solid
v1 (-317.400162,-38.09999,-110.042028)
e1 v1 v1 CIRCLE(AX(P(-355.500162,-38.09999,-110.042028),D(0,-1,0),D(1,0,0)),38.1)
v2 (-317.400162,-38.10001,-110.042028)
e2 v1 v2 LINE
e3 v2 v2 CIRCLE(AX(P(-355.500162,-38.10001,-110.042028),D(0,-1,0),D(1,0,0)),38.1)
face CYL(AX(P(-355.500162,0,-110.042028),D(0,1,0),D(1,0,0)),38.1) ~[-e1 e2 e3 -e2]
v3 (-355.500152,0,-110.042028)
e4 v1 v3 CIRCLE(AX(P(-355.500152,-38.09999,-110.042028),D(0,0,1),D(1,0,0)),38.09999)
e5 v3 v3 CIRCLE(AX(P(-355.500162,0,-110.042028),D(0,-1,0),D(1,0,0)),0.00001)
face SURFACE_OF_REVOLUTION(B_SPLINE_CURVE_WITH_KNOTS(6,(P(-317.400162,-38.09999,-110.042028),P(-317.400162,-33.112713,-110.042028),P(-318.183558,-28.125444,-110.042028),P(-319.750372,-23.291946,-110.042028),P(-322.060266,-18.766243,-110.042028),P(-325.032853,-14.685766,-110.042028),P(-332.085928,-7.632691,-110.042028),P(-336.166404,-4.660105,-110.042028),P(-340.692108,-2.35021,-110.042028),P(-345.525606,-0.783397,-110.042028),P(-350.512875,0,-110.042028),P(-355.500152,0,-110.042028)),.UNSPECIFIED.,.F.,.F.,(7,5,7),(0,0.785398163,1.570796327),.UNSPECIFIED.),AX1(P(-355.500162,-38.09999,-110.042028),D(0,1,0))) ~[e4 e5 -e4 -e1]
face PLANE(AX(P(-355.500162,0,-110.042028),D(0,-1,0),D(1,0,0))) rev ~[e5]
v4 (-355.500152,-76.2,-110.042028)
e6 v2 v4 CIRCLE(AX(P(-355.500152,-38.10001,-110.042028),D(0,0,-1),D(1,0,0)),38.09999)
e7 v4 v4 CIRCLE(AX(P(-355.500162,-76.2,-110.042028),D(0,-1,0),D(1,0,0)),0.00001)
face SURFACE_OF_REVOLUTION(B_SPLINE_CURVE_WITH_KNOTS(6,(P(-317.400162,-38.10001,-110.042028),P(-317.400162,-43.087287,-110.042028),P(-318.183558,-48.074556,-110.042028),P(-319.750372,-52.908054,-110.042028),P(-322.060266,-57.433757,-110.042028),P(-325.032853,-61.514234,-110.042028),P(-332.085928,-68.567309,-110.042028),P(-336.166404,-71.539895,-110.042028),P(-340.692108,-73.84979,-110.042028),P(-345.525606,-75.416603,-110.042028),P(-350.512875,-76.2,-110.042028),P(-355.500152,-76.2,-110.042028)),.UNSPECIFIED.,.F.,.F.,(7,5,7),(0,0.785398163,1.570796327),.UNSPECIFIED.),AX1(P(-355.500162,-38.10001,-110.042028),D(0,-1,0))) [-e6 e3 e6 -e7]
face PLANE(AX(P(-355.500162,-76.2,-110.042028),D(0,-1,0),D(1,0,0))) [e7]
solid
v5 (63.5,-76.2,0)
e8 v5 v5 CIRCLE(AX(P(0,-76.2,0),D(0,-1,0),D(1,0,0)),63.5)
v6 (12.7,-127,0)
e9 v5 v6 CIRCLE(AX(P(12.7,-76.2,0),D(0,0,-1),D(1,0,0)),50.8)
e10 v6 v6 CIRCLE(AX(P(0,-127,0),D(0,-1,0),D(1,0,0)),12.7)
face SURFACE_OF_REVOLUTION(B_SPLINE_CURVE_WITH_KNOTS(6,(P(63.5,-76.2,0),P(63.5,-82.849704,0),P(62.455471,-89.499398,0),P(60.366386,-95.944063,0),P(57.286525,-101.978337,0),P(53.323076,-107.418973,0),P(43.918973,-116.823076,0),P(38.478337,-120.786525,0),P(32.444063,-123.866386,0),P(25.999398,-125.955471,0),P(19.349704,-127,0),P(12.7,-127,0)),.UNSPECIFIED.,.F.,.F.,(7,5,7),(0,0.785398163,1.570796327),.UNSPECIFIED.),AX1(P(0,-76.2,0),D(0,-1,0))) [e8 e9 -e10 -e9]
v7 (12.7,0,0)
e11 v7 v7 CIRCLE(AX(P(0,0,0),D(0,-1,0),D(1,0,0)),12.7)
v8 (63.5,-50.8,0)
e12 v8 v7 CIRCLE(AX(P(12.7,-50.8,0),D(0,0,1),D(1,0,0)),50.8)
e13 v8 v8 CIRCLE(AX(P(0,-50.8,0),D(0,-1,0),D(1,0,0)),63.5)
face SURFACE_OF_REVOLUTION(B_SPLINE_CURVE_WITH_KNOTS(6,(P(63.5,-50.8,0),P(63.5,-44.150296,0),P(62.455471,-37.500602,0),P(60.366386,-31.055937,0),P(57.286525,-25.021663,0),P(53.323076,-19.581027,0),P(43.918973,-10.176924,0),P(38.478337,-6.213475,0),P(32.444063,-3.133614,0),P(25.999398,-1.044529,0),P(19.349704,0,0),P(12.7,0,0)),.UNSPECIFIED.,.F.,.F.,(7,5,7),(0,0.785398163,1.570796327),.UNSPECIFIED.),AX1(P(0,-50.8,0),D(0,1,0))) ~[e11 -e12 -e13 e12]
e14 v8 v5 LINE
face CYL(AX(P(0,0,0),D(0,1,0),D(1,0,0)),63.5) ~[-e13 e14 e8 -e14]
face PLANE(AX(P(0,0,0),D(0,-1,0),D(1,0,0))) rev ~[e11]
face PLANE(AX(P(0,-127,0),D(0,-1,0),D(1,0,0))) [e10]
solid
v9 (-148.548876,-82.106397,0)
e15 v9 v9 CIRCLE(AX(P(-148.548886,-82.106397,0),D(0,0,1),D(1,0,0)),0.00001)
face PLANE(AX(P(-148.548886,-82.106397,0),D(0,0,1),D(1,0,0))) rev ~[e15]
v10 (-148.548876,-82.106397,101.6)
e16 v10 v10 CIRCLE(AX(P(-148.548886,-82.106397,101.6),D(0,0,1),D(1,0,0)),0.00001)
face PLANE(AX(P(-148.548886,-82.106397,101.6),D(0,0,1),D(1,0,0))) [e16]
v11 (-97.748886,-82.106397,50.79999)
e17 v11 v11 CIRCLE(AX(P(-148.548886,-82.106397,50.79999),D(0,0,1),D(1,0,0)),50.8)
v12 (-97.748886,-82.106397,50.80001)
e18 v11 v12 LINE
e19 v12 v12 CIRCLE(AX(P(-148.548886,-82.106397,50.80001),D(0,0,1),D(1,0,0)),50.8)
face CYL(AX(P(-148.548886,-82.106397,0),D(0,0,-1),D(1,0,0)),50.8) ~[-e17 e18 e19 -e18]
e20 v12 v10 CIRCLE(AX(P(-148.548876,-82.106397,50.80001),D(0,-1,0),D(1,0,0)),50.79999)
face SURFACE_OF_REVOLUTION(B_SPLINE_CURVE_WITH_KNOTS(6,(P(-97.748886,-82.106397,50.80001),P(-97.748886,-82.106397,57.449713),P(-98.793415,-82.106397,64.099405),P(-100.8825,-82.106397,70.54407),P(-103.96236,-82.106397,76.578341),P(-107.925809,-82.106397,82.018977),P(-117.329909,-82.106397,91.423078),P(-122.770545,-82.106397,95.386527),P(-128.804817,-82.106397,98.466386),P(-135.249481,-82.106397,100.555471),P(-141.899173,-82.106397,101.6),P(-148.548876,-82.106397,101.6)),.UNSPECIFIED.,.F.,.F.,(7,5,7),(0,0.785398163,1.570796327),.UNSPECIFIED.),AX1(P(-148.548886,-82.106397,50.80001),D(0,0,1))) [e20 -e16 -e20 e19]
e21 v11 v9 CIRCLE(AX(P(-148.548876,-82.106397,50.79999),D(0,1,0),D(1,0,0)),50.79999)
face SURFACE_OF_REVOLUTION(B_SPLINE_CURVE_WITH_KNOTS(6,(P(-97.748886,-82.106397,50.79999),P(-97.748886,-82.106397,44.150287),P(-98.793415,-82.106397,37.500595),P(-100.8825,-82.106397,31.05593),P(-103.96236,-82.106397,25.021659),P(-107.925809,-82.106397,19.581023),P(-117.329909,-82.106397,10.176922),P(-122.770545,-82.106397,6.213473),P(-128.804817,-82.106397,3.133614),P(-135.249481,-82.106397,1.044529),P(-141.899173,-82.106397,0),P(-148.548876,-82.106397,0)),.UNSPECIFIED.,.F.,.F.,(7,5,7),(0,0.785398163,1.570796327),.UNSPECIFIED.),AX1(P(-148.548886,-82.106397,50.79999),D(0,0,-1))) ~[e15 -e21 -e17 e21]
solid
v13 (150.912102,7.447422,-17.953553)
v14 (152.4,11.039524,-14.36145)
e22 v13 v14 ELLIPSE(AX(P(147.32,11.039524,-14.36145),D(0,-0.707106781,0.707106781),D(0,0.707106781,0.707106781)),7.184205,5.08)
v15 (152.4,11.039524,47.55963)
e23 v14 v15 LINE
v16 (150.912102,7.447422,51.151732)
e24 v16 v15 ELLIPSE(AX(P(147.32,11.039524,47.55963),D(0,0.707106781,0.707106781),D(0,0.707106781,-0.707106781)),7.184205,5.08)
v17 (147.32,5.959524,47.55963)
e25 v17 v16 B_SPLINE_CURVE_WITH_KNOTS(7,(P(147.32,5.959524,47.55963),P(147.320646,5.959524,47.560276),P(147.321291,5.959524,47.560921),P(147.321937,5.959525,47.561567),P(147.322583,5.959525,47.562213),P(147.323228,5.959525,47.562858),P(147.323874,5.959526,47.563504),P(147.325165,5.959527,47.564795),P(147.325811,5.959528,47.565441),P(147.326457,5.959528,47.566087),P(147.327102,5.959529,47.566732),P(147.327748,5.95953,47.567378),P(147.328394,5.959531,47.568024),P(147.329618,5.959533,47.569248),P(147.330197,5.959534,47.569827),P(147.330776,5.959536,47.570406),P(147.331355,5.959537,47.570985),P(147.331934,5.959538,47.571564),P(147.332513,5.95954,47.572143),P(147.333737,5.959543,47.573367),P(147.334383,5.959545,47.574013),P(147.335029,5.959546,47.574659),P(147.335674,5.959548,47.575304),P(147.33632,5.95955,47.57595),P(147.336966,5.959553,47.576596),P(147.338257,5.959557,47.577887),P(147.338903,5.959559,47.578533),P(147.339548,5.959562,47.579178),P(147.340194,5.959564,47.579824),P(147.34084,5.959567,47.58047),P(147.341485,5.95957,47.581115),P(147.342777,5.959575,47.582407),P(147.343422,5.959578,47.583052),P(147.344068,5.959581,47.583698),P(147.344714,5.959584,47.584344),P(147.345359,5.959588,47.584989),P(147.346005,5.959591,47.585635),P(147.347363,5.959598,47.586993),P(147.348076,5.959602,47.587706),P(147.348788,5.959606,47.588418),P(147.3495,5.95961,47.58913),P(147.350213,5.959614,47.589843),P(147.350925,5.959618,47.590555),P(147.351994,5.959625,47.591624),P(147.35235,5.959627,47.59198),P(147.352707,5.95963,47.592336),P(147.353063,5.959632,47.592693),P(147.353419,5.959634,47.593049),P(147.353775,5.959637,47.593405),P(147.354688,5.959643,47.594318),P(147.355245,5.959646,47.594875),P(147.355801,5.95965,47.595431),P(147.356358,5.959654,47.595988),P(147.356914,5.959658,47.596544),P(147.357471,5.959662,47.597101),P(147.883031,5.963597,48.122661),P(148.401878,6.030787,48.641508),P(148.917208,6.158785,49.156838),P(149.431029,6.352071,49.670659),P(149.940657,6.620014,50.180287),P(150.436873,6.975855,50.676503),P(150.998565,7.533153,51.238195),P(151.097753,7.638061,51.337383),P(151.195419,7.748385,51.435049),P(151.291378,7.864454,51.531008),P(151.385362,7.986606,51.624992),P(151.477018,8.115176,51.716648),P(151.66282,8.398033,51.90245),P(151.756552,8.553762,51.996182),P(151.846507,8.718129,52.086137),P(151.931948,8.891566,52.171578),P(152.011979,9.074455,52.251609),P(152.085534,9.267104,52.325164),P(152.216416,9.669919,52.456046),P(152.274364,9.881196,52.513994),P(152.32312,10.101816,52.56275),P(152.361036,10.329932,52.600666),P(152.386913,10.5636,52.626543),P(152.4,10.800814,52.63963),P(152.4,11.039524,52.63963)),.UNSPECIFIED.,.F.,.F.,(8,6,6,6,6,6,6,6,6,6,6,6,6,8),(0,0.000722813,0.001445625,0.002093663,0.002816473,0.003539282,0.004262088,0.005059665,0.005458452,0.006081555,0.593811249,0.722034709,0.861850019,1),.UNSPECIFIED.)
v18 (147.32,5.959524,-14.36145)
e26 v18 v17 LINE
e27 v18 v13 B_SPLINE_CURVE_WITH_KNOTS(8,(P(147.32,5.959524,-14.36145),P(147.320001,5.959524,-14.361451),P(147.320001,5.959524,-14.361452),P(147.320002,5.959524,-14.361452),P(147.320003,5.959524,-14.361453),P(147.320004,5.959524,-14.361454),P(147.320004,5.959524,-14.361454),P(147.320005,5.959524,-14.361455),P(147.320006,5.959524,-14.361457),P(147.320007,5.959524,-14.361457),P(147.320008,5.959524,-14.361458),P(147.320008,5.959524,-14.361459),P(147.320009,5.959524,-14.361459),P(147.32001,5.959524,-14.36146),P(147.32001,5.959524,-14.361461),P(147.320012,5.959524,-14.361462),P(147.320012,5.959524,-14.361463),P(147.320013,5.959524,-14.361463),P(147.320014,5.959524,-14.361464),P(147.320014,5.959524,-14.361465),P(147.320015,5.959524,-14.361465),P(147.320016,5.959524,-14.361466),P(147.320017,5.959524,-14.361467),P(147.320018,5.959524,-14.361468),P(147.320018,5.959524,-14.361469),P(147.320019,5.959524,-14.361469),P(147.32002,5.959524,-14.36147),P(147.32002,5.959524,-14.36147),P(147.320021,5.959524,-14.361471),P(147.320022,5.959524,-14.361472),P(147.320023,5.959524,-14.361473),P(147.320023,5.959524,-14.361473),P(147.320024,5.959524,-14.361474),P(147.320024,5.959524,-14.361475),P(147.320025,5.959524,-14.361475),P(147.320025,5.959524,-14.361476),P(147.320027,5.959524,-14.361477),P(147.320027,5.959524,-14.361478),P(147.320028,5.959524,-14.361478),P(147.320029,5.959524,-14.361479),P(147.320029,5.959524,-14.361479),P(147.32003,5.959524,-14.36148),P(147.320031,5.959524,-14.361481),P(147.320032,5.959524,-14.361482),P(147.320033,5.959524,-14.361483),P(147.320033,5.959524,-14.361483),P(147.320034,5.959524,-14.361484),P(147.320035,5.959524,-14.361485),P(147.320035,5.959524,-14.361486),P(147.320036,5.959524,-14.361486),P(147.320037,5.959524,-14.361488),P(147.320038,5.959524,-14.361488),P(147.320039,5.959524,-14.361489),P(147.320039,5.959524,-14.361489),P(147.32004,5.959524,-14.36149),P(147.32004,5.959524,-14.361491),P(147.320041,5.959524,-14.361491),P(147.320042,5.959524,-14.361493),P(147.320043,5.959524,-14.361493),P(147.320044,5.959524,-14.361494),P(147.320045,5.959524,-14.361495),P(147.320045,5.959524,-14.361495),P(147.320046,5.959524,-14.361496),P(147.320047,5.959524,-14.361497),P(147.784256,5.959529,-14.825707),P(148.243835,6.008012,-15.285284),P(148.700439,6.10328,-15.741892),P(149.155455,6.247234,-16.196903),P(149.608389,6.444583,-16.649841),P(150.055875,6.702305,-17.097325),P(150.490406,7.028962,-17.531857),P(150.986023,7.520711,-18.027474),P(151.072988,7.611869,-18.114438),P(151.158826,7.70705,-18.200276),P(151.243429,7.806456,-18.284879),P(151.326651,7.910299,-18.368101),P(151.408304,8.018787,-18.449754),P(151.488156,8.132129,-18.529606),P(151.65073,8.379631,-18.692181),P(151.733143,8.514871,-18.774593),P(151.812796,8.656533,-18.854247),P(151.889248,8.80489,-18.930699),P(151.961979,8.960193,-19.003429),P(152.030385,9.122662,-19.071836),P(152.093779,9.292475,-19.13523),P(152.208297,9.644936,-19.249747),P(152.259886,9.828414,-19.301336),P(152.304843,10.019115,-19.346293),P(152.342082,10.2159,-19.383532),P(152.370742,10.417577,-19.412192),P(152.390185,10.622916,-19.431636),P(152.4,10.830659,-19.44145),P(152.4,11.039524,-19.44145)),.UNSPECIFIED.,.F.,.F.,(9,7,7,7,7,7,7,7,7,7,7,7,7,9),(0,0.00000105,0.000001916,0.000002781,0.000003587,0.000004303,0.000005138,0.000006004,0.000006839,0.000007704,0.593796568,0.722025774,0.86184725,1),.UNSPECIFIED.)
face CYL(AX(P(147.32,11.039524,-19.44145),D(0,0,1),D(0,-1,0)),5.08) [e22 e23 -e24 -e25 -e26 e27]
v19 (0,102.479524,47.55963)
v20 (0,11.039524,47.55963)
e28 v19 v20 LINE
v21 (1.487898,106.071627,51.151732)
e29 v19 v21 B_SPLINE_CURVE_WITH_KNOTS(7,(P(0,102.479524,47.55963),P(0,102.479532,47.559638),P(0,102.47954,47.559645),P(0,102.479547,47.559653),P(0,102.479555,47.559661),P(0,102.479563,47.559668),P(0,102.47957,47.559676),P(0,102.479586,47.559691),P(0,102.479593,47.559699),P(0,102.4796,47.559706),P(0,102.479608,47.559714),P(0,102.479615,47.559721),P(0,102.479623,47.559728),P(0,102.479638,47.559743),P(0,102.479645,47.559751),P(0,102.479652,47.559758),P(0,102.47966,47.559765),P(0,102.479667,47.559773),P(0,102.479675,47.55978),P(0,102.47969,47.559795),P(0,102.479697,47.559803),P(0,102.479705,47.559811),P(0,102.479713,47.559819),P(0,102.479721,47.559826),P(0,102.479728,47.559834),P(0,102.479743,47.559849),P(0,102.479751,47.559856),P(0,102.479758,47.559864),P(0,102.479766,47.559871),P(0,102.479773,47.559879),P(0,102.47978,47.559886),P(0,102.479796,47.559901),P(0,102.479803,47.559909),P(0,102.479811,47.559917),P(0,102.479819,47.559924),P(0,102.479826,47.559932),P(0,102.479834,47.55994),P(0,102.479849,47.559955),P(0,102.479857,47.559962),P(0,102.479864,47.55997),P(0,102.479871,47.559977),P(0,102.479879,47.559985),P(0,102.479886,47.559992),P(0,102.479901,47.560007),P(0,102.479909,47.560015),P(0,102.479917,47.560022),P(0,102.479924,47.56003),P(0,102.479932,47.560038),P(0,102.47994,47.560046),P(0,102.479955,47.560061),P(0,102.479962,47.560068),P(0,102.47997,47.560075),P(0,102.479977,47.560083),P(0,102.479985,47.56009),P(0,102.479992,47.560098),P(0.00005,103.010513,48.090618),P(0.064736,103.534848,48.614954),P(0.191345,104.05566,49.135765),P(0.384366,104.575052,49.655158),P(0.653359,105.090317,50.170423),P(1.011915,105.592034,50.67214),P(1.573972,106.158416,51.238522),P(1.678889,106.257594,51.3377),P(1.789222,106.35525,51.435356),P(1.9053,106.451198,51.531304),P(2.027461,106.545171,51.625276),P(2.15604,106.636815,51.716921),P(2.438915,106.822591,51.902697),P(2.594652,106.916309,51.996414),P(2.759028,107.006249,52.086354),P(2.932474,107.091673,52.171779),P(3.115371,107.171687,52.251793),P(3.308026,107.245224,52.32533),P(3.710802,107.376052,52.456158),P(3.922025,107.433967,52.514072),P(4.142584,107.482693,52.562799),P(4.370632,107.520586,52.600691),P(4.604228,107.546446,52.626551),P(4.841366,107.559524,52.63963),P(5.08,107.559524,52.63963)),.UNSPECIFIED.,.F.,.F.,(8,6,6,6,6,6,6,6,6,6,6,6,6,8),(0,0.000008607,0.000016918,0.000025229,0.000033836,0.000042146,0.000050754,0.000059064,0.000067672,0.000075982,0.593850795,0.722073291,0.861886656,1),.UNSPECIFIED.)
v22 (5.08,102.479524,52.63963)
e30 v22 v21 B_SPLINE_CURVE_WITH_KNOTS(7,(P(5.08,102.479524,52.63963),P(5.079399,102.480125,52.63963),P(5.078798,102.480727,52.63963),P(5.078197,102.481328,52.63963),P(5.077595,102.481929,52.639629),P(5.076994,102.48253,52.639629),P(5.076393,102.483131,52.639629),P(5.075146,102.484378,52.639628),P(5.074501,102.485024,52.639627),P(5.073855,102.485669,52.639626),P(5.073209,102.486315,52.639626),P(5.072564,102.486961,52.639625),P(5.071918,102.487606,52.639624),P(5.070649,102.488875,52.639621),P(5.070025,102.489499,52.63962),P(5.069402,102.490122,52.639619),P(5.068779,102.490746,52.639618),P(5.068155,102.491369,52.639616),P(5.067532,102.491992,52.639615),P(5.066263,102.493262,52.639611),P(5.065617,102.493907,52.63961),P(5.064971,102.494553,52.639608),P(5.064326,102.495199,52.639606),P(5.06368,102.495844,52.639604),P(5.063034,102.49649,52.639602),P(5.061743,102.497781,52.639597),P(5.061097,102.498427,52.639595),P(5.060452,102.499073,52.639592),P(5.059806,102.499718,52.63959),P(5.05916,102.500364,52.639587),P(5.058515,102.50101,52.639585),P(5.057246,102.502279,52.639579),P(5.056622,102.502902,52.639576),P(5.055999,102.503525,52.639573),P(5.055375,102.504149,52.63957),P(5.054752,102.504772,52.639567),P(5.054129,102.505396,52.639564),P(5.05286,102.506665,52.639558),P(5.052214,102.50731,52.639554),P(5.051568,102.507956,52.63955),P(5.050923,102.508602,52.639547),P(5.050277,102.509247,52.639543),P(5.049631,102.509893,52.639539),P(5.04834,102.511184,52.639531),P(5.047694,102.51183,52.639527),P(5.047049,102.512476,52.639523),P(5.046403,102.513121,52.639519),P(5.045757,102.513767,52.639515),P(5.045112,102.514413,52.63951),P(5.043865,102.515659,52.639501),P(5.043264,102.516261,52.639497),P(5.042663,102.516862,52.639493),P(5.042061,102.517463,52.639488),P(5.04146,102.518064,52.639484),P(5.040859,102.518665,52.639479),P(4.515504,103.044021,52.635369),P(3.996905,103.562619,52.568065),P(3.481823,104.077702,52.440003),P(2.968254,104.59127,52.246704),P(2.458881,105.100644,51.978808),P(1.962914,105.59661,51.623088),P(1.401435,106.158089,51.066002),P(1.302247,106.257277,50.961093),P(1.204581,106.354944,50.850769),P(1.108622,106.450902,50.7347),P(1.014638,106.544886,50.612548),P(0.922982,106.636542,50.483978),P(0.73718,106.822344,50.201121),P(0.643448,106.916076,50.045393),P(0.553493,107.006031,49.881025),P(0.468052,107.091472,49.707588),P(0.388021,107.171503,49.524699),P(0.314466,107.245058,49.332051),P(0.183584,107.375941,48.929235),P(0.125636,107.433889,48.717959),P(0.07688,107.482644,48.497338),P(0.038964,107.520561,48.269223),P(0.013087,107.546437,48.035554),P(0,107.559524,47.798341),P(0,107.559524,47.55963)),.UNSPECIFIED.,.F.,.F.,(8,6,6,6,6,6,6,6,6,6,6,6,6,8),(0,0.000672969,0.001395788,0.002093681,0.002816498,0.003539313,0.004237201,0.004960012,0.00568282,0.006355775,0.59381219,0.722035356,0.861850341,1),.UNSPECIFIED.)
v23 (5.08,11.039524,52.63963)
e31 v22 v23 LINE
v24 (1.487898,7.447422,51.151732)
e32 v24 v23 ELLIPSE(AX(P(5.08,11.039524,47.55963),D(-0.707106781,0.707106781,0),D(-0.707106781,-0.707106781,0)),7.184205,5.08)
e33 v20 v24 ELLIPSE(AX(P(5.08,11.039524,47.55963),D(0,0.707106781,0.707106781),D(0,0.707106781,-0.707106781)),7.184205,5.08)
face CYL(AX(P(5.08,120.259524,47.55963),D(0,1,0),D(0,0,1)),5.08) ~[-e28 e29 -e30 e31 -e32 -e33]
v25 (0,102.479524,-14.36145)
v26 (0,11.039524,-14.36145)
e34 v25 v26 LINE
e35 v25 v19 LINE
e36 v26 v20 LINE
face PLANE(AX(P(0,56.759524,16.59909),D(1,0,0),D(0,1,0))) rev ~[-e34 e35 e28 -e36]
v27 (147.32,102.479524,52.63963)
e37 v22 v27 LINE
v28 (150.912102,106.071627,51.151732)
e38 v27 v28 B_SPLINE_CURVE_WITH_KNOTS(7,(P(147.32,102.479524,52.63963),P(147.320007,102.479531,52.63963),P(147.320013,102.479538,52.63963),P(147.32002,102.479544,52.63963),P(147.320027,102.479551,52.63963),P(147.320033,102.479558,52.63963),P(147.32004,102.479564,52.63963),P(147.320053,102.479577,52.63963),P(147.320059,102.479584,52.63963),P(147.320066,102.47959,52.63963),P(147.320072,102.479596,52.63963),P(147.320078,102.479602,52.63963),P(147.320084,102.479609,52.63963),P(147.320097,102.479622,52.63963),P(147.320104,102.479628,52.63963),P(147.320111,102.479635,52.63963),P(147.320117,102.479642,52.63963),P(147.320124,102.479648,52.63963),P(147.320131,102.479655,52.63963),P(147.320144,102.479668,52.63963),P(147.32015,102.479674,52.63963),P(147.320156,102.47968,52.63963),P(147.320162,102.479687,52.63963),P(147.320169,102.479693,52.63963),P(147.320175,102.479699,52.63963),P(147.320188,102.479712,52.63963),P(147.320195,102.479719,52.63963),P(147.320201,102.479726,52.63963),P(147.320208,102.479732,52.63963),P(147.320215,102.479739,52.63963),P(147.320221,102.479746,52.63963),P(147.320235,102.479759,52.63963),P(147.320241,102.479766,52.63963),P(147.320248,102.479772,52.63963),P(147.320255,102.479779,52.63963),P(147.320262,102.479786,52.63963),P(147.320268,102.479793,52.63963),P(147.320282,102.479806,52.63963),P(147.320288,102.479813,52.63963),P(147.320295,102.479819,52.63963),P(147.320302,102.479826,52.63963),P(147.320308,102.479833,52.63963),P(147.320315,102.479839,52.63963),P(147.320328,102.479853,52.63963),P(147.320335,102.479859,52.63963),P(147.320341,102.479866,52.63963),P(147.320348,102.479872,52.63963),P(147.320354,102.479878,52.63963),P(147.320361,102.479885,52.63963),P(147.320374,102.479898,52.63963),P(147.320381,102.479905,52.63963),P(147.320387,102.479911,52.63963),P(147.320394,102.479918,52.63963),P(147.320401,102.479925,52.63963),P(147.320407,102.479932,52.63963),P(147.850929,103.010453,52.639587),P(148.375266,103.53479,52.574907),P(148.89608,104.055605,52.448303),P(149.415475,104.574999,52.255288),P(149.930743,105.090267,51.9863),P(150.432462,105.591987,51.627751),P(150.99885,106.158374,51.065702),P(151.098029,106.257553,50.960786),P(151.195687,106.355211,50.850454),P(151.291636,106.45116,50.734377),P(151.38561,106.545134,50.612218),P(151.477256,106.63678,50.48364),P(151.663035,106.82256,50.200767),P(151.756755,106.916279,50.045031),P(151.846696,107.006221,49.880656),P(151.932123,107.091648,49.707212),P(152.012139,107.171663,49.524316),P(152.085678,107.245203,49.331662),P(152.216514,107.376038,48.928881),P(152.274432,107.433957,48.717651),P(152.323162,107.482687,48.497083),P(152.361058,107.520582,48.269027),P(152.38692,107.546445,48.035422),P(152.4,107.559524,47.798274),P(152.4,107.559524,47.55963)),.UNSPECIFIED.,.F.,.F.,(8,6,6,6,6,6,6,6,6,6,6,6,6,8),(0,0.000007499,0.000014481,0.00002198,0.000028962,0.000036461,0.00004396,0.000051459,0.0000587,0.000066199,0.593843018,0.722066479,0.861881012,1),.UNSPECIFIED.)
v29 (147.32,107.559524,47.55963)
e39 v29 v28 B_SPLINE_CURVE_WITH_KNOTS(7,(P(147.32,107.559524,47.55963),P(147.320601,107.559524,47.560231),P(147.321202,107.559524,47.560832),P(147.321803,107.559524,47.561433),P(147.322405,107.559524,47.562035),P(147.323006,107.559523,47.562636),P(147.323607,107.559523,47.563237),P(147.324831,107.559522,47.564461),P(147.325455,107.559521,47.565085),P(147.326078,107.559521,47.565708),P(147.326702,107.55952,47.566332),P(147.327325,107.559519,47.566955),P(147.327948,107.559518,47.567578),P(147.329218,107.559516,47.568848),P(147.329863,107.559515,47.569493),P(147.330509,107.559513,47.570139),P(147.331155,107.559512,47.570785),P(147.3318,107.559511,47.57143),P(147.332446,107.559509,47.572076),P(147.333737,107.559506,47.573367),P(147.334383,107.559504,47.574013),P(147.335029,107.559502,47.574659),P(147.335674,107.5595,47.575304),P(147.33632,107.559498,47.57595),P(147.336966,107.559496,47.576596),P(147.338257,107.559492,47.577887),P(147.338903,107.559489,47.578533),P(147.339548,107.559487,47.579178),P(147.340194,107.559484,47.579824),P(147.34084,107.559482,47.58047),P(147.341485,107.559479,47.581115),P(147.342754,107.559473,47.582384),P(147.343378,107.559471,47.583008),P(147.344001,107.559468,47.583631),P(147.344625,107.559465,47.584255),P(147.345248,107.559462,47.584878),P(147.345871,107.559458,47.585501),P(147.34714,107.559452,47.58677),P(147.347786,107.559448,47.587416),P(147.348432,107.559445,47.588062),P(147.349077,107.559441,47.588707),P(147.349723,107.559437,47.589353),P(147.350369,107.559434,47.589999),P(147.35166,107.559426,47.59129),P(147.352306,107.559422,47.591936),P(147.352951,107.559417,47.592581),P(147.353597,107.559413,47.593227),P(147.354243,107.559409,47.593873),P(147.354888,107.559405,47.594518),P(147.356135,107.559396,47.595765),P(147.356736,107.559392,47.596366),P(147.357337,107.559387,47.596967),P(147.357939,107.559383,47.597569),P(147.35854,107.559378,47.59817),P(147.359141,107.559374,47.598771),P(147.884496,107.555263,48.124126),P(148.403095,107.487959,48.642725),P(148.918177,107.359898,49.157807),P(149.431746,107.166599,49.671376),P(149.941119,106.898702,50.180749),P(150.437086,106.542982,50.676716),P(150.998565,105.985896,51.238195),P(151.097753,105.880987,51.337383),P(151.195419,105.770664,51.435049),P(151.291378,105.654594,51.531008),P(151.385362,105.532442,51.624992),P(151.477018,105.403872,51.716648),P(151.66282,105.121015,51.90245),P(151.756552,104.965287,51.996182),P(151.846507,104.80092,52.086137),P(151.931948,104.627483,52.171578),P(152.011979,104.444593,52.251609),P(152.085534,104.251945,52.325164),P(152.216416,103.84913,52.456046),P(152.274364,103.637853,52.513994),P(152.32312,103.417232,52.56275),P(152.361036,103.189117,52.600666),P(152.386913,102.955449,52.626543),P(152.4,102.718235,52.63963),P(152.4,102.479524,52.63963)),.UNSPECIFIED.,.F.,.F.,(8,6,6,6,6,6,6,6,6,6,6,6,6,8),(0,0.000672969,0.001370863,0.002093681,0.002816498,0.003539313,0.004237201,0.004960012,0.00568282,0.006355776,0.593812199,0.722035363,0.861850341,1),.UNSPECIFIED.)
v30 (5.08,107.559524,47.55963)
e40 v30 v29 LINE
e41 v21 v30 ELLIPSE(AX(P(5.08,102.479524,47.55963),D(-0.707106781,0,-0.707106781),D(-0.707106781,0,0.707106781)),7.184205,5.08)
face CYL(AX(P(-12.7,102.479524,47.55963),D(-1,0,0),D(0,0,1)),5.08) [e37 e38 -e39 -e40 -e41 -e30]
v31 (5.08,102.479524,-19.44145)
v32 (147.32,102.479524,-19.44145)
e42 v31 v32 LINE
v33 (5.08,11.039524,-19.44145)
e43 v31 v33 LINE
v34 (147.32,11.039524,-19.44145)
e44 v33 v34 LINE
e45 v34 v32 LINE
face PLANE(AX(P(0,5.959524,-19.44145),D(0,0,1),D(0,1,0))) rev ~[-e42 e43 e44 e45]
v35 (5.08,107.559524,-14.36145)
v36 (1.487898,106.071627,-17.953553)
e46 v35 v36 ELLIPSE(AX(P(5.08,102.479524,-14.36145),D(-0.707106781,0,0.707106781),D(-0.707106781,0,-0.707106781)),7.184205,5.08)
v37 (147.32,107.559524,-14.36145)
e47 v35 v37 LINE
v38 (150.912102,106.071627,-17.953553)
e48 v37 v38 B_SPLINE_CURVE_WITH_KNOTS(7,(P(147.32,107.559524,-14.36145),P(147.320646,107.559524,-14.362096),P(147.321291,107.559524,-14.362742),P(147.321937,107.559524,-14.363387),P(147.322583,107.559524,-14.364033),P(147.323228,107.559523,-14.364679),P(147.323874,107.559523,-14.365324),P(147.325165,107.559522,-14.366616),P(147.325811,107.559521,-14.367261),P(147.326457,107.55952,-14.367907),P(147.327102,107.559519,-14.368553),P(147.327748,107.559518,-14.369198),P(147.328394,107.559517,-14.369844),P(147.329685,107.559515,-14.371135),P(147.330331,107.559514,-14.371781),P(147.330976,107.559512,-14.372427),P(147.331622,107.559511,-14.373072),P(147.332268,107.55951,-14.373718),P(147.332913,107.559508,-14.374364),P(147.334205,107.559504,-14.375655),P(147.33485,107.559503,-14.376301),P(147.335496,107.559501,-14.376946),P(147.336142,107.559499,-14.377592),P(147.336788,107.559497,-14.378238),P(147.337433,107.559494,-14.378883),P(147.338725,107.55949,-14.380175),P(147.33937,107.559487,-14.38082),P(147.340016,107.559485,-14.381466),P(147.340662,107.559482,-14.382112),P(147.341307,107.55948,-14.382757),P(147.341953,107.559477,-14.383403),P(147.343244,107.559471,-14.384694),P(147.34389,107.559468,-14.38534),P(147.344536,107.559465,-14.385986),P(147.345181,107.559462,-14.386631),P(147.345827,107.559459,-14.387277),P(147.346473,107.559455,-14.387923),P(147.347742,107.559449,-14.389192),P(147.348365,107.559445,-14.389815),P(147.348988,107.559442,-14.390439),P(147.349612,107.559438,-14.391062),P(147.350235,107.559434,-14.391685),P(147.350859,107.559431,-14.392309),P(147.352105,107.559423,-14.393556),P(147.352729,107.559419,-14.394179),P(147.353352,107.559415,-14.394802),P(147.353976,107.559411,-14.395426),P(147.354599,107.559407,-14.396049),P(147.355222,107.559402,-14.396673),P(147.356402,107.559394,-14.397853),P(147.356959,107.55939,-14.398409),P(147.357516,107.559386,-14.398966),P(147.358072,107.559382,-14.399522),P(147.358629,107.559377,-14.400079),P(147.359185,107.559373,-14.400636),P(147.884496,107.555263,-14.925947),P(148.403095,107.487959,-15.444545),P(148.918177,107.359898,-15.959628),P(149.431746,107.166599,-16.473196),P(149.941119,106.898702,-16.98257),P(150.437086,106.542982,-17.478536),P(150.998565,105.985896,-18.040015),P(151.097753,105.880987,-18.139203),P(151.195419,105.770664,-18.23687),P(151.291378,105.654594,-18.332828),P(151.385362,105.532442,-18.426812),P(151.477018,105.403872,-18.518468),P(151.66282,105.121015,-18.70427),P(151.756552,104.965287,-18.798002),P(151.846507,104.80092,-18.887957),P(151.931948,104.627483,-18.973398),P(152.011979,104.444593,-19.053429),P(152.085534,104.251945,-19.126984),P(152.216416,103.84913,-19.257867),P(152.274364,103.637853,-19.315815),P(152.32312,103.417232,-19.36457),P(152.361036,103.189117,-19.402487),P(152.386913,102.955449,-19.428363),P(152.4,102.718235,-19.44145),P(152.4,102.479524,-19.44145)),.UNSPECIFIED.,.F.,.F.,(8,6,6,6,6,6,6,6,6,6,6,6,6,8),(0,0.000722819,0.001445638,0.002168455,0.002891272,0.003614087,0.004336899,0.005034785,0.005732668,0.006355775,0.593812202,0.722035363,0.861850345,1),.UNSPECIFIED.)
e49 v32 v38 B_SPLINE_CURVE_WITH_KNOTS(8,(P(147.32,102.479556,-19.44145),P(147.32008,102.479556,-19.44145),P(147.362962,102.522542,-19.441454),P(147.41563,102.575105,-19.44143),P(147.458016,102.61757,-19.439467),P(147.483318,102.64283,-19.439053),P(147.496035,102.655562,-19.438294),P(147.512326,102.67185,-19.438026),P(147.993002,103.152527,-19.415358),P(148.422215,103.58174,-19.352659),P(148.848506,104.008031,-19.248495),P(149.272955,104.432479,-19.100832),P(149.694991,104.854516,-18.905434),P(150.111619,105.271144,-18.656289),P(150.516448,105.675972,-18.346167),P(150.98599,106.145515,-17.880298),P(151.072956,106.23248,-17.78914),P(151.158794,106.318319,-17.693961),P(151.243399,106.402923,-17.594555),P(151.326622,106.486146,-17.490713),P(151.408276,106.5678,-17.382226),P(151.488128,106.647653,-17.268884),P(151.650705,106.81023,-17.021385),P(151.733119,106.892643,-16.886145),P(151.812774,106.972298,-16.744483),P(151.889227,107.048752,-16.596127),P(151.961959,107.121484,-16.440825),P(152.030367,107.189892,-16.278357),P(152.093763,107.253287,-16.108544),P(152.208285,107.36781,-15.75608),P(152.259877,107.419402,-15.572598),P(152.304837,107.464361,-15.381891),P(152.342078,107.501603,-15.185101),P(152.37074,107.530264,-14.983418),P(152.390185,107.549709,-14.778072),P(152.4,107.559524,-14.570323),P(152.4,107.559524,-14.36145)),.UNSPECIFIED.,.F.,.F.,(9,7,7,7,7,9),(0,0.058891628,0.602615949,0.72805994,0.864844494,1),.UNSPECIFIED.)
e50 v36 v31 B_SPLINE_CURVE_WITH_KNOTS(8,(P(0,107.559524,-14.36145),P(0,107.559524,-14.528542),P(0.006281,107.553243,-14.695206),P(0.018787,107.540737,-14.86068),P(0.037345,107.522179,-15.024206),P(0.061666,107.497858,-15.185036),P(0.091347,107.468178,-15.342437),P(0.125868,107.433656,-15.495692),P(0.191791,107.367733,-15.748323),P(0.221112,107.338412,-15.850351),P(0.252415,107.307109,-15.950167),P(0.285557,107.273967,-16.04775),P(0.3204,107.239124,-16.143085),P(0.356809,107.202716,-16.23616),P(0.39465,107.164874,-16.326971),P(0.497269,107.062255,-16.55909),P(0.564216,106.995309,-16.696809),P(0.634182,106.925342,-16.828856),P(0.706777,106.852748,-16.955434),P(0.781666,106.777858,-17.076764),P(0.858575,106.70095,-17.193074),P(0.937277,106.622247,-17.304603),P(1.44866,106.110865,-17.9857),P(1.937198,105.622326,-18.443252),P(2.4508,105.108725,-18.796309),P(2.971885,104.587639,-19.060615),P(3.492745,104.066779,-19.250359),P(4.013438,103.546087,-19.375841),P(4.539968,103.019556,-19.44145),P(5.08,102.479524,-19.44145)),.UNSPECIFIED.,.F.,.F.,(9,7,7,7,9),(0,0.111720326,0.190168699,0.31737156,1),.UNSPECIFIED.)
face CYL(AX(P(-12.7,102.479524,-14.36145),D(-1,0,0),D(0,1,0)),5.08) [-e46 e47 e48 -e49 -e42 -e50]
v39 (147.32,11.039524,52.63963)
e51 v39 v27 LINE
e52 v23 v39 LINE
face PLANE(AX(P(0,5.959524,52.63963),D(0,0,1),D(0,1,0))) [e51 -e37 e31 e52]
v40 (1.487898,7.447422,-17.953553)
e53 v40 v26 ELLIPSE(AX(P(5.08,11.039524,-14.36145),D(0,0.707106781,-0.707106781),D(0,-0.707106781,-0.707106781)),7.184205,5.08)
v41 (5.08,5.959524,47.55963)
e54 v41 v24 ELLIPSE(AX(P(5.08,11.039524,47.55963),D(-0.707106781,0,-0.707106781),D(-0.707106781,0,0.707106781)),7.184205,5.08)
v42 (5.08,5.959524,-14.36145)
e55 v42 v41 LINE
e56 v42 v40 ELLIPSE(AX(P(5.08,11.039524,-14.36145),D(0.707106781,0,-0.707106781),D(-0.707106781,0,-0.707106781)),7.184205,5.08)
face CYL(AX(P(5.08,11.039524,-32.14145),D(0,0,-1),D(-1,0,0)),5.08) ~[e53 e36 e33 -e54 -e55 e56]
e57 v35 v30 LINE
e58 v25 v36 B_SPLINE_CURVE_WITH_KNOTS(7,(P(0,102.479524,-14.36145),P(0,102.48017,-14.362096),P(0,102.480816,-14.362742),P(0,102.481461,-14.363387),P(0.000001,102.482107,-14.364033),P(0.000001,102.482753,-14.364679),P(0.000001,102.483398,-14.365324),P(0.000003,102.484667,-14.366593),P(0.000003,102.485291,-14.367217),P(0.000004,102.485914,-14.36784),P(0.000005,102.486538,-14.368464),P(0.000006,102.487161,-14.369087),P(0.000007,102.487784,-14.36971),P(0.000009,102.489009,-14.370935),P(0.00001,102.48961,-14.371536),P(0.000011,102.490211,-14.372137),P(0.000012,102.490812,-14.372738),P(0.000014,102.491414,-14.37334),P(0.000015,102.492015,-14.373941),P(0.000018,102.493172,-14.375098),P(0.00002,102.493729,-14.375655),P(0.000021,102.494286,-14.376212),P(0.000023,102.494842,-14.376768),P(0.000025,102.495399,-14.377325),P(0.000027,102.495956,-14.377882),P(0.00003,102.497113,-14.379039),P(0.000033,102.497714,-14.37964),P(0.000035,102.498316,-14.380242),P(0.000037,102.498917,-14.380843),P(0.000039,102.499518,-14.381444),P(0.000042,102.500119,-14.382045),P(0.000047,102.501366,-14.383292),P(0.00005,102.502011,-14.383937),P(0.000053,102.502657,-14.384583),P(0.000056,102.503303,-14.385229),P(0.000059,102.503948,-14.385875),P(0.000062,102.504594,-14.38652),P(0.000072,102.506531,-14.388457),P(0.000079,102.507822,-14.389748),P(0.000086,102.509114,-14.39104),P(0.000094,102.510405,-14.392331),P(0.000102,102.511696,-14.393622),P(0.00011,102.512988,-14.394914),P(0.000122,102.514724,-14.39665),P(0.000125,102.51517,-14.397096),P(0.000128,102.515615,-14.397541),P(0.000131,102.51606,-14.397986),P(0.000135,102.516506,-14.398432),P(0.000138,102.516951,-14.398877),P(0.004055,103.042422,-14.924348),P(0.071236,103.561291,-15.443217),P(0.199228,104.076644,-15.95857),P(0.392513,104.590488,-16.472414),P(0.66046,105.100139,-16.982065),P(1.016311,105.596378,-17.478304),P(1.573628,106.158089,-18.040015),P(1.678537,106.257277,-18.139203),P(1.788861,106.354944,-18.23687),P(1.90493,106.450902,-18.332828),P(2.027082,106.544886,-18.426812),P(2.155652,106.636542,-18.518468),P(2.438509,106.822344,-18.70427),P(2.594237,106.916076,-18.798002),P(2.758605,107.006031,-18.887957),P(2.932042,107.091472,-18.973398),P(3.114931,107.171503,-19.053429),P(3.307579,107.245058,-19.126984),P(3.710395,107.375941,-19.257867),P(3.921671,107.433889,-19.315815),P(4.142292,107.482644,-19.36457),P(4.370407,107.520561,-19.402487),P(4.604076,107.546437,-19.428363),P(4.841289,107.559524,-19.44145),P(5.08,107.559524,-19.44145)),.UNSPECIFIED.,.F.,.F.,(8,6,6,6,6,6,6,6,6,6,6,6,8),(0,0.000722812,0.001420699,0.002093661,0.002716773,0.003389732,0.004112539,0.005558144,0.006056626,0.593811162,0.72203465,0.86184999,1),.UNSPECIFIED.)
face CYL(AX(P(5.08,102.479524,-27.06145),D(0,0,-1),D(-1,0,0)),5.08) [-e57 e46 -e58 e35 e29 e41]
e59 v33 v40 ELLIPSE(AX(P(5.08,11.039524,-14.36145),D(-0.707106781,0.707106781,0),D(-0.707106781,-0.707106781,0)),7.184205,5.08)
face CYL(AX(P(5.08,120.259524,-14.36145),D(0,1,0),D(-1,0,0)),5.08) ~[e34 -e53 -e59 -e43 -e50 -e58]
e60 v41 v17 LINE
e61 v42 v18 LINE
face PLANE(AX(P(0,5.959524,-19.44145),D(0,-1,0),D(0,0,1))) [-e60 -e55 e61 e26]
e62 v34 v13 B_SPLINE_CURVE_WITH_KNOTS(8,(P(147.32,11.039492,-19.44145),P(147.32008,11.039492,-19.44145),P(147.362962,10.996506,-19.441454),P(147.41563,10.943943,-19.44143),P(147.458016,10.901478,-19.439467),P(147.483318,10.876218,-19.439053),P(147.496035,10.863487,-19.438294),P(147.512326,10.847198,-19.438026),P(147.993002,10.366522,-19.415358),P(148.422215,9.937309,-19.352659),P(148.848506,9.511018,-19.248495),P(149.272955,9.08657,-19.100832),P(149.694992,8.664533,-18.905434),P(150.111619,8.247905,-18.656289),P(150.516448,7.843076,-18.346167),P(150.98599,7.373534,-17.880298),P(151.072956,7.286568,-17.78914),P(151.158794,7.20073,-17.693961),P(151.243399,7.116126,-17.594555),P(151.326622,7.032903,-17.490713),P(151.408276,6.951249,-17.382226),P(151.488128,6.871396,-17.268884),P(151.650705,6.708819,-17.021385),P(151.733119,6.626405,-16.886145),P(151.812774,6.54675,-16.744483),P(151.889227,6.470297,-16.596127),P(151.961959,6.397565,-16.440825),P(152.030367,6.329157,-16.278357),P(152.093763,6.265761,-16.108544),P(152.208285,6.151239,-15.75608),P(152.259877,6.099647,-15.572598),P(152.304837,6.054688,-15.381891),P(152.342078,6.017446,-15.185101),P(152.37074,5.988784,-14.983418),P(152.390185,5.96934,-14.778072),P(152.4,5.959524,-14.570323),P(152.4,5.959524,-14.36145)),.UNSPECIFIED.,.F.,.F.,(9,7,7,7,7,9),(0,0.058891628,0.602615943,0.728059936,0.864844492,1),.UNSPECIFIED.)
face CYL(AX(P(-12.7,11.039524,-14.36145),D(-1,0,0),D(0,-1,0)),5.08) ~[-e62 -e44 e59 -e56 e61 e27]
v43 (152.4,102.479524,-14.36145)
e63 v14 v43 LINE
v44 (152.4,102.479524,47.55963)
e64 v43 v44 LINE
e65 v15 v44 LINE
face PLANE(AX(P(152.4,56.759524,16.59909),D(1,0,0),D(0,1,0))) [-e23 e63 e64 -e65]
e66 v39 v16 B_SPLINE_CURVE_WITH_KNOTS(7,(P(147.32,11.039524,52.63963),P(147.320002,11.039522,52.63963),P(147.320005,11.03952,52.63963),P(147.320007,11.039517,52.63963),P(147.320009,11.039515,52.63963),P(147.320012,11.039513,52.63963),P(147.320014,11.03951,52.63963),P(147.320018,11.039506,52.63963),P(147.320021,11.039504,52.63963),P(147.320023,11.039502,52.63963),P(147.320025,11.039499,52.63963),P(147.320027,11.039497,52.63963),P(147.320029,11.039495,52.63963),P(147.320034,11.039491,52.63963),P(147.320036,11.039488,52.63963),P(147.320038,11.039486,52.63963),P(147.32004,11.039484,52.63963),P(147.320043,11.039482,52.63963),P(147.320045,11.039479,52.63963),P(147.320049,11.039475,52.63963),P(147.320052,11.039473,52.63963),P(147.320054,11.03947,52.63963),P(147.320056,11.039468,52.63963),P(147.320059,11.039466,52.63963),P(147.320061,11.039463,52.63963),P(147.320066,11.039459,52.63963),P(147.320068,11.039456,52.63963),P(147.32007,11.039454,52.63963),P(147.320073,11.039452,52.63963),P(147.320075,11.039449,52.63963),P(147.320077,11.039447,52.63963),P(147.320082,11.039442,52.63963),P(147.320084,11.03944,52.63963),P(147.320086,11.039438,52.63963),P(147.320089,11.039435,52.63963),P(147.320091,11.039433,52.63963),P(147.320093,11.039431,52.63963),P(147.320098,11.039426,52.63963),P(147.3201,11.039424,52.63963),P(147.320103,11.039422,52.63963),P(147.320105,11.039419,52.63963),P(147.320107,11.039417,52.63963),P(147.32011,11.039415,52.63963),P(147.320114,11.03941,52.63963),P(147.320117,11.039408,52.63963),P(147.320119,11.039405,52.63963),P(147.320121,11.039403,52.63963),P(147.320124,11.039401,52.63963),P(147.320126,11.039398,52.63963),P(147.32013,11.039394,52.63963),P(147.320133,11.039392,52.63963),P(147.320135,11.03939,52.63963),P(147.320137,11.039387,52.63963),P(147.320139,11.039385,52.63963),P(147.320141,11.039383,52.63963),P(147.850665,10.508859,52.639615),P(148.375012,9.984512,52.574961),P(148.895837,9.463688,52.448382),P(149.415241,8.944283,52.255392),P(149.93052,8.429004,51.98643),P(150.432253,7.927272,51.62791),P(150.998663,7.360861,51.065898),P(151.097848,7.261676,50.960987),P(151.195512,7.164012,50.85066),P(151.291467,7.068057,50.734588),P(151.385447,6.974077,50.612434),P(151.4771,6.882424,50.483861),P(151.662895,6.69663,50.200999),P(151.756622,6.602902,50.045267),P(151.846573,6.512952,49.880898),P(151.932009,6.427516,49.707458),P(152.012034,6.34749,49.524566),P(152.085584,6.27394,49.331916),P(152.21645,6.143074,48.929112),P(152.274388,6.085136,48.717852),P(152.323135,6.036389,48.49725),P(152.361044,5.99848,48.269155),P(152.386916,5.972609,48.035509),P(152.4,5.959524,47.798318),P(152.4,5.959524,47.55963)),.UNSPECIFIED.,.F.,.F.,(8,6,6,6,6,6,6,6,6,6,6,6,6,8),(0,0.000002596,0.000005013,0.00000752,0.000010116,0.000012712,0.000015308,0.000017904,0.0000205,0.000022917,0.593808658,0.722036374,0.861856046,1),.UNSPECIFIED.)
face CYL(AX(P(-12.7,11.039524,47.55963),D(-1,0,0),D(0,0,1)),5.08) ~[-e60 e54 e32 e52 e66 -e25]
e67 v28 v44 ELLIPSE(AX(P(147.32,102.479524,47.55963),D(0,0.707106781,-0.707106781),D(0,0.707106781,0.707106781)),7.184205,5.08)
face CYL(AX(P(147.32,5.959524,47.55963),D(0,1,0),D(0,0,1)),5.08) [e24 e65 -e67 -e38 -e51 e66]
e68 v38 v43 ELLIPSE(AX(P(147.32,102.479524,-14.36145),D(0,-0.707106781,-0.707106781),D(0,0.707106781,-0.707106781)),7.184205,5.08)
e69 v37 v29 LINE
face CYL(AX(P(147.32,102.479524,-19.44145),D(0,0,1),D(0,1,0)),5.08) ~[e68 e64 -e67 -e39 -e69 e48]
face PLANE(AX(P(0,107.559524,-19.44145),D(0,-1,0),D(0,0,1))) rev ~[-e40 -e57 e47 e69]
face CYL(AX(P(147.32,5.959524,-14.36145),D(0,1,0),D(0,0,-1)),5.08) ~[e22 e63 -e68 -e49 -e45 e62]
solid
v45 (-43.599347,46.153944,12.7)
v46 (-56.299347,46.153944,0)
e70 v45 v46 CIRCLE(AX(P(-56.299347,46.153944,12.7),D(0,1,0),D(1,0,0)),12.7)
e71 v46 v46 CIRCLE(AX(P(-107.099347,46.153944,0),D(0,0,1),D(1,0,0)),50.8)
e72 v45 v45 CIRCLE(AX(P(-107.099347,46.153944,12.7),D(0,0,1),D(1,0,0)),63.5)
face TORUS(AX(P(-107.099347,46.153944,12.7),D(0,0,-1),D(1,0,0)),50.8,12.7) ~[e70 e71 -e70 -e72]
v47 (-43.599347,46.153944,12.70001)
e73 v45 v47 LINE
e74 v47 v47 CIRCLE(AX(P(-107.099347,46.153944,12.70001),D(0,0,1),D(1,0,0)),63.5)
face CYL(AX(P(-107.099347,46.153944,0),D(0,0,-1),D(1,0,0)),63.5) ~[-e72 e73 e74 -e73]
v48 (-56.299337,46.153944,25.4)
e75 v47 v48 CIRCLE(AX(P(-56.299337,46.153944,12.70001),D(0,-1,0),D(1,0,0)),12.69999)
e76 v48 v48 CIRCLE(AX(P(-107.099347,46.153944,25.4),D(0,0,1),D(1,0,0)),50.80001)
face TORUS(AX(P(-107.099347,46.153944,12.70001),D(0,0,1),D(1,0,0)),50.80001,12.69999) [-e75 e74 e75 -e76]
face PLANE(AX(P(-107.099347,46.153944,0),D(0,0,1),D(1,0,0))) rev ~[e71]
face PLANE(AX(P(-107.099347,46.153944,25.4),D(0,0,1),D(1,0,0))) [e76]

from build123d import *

# Parameters (mm, degrees)
F0_R         = 63.5
F1_DEPTH     = 127
F2_R         = 50.8
F3_R         = 50.8
F4_W         = 101.6
F4_H         = 72.0810802626
F5_DEPTH     = 152.4
F6_R         = 5.08
F7_T1_DEPTH  = 172.72
F7_T3_DEPTH  = 127
F8_T1_DEPTH  = 92.4010802627
F8_T3_DEPTH  = 172.72
F9_T1_DEPTH  = 121.92
F9_T3_DEPTH  = 172.72
F10_T1_DEPTH = 87.3210802627
F11_R        = 63.5
F12_DEPTH    = 25.4
F13_R        = 12.7
F14_R        = 12.69999
F15_R        = 50.8
F16_DEPTH    = 101.6
F17_R        = 50.79999
F18_R        = 38.1
F19_DEPTH    = 76.2
F20_R        = 38.09999


# Not quite as in the source:
# - a fillet or chamfer that OpenCascade refuses, or shapes differently, is made with other operations: its cross-section is extruded or revolved along the edge and cut away or added
# - a fillet or chamfer is up to 0.001 mm smaller than in the source, because OpenCascade refuses the exact size


with BuildPart() as f1:
    # F0 (on Front) → F1 (new body)
    with BuildSketch(Plane.XZ):
        Circle(F0_R)
    extrude(amount=F1_DEPTH)

    # F2
    f2_edges = [f1.edges().sort_by_distance(p)[0] for p in [
        (-63.5, -127, 0),
    ]]
    fillet(f2_edges, radius=F2_R)

    # F3
    f3_edges = [f1.edges().sort_by_distance(p)[0] for p in [
        (-63.5, 0, 0),
    ]]
    fillet(f3_edges, radius=F3_R)


with BuildPart() as f5:
    # F4 (on Right) → F5 (new body)
    with BuildSketch(Plane.YZ):
        with Locations((56.7595242755, 16.5990898386)):
            Rectangle(F4_W, F4_H)
    extrude(amount=F5_DEPTH)

    # F6
    f6_edges = [f5.edges().sort_by_distance(p)[0] for p in [
        (152.4, 56.759524, 52.63963),
        (152.4, 5.959524, 16.59909),
        (152.4, 56.759524, -19.44145),
        (152.4, 107.559524, 16.59909),
    ]]
    fillet(f6_edges, radius=F6_R)

    # F7: fillet of radius 5.08 on 4 edges, made by hand

    # F7_s2 → F7_t1 (cut)
    with BuildSketch(Plane.YZ.offset(-12.7)):
        with BuildLine():
            ThreePointArc((102.4795242755, 52.6396299699), (106.071626724, 51.1517324183), (107.5595242755, 47.5596299699))
            Line((107.5595242755, 47.5596299699), (107.5595242755, 52.6396299699))
            Line((107.5595242755, 52.6396299699), (102.4795242755, 52.6396299699))
        make_face()
        with BuildLine():
            ThreePointArc((11.0395242755, 52.6396299699), (7.4474218271, 51.1517324183), (5.9595242755, 47.5596299699))
            Line((5.9595242755, 47.5596299699), (5.9595242755, 52.6396299699))
            Line((5.9595242755, 52.6396299699), (11.0395242755, 52.6396299699))
        make_face()
    extrude(amount=F7_T1_DEPTH, mode=Mode.SUBTRACT)

    # F7_s4 → F7_t3 (cut)
    with BuildSketch(Plane.XZ.offset(-120.2595242755)):
        with BuildLine():
            ThreePointArc((5.08, 52.6396299699), (1.4878975516, 51.1517324183), (0, 47.5596299699))
            Line((0, 47.5596299699), (0, 52.6396299699))
            Line((0, 52.6396299699), (5.08, 52.6396299699))
        make_face()
    extrude(amount=F7_T3_DEPTH, mode=Mode.SUBTRACT)

    # F8: fillet of radius 5.08 on 4 edges, made by hand

    # F8_s2 → F8_t1 (cut)
    with BuildSketch(Plane.XY.offset(-32.1414502928)):
        with BuildLine():
            ThreePointArc((0, 11.0395242755), (1.4878975516, 7.4474218271), (5.08, 5.9595242755))
            Line((5.08, 5.9595242755), (0, 5.9595242755))
            Line((0, 5.9595242755), (0, 11.0395242755))
        make_face()
    extrude(amount=F8_T1_DEPTH, mode=Mode.SUBTRACT)

    # F8_s4 → F8_t3 (cut)
    with BuildSketch(Plane.YZ.offset(-12.7)):
        with BuildLine():
            ThreePointArc((5.9595242755, -14.3614502928), (7.4474218271, -17.9535527412), (11.0395242755, -19.4414502928))
            Line((11.0395242755, -19.4414502928), (5.9595242755, -19.4414502928))
            Line((5.9595242755, -19.4414502928), (5.9595242755, -14.3614502928))
        make_face()
    extrude(amount=F8_T3_DEPTH, mode=Mode.SUBTRACT)

    # F9: fillet of radius 5.08 on 4 edges, made by hand

    # F9_s2 → F9_t1 (cut)
    with BuildSketch(Plane.XZ.offset(-120.2595242755)):
        with BuildLine():
            ThreePointArc((0, -14.3614502928), (1.4878975516, -17.9535527412), (5.08, -19.4414502928))
            Line((5.08, -19.4414502928), (0, -19.4414502928))
            Line((0, -19.4414502928), (0, -14.3614502928))
        make_face()
    extrude(amount=F9_T1_DEPTH, mode=Mode.SUBTRACT)

    # F9_s4 → F9_t3 (cut)
    with BuildSketch(Plane.YZ.offset(-12.7)):
        with BuildLine():
            ThreePointArc((107.5595242755, -14.3614502928), (106.071626724, -17.9535527412), (102.4795242755, -19.4414502928))
            Line((102.4795242755, -19.4414502928), (107.5595242755, -19.4414502928))
            Line((107.5595242755, -19.4414502928), (107.5595242755, -14.3614502928))
        make_face()
    extrude(amount=F9_T3_DEPTH, mode=Mode.SUBTRACT)

    # F10: fillet of radius 5.08 on 4 edges, made by hand

    # F10_s2 → F10_t1 (cut)
    with BuildSketch(Plane.XY.offset(-27.0614502928)):
        with BuildLine():
            ThreePointArc((0, 102.4795242755), (1.4878975516, 106.071626724), (5.08, 107.5595242755))
            Line((5.08, 107.5595242755), (0, 107.5595242755))
            Line((0, 107.5595242755), (0, 102.4795242755))
        make_face()
    extrude(amount=F10_T1_DEPTH, mode=Mode.SUBTRACT)


with BuildPart() as f12:
    # F11 (on Top) → F12 (new body)
    with BuildSketch(Plane.XY):
        with Locations((-107.0993468165, 46.1539439857)):
            Circle(F11_R)
    extrude(amount=F12_DEPTH)

    # F13
    f13_edges = [f12.edges().sort_by_distance(p)[0] for p in [
        (-170.599347, 46.153944, 0),
    ]]
    fillet(f13_edges, radius=F13_R)

    # F14 (radius 12.7 in the source; OpenCascade refuses exactly that, so slightly less here)
    f14_edges = [f12.edges().sort_by_distance(p)[0] for p in [
        (-170.599347, 46.153944, 25.4),
    ]]
    fillet(f14_edges, radius=F14_R)


with BuildPart() as f16:
    # F15 (on Top) → F16 (new body)
    with BuildSketch(Plane.XY):
        with Locations((-148.5488861799, -82.1063965559)):
            Circle(F15_R)
    extrude(amount=F16_DEPTH)

    # F17 (radius 50.8 in the source; OpenCascade refuses exactly that, so slightly less here)
    f17_edges = [f16.edges().sort_by_distance(p)[0] for p in [
        (-199.348886, -82.106397, 101.6),
        (-97.748886, -82.106397, 50.8),
        (-199.348886, -82.106397, 0),
    ]]
    fillet(f17_edges, radius=F17_R)


with BuildPart() as f19:
    # F18 (on Front) → F19 (new body)
    with BuildSketch(Plane.XZ):
        with Locations((-355.5001616478, -110.0420281291)):
            Circle(F18_R)
    extrude(amount=F19_DEPTH)

    # F20 (radius 38.1 in the source; OpenCascade refuses exactly that, so slightly less here)
    f20_edges = [f19.edges().sort_by_distance(p)[0] for p in [
        (-393.600162, -76.2, -110.042028),
        (-317.400162, -38.1, -110.042028),
        (-393.600162, 0, -110.042028),
    ]]
    fillet(f20_edges, radius=F20_R)


solid = Compound([f1.part, f5.part, f12.part, f16.part, f19.part])
